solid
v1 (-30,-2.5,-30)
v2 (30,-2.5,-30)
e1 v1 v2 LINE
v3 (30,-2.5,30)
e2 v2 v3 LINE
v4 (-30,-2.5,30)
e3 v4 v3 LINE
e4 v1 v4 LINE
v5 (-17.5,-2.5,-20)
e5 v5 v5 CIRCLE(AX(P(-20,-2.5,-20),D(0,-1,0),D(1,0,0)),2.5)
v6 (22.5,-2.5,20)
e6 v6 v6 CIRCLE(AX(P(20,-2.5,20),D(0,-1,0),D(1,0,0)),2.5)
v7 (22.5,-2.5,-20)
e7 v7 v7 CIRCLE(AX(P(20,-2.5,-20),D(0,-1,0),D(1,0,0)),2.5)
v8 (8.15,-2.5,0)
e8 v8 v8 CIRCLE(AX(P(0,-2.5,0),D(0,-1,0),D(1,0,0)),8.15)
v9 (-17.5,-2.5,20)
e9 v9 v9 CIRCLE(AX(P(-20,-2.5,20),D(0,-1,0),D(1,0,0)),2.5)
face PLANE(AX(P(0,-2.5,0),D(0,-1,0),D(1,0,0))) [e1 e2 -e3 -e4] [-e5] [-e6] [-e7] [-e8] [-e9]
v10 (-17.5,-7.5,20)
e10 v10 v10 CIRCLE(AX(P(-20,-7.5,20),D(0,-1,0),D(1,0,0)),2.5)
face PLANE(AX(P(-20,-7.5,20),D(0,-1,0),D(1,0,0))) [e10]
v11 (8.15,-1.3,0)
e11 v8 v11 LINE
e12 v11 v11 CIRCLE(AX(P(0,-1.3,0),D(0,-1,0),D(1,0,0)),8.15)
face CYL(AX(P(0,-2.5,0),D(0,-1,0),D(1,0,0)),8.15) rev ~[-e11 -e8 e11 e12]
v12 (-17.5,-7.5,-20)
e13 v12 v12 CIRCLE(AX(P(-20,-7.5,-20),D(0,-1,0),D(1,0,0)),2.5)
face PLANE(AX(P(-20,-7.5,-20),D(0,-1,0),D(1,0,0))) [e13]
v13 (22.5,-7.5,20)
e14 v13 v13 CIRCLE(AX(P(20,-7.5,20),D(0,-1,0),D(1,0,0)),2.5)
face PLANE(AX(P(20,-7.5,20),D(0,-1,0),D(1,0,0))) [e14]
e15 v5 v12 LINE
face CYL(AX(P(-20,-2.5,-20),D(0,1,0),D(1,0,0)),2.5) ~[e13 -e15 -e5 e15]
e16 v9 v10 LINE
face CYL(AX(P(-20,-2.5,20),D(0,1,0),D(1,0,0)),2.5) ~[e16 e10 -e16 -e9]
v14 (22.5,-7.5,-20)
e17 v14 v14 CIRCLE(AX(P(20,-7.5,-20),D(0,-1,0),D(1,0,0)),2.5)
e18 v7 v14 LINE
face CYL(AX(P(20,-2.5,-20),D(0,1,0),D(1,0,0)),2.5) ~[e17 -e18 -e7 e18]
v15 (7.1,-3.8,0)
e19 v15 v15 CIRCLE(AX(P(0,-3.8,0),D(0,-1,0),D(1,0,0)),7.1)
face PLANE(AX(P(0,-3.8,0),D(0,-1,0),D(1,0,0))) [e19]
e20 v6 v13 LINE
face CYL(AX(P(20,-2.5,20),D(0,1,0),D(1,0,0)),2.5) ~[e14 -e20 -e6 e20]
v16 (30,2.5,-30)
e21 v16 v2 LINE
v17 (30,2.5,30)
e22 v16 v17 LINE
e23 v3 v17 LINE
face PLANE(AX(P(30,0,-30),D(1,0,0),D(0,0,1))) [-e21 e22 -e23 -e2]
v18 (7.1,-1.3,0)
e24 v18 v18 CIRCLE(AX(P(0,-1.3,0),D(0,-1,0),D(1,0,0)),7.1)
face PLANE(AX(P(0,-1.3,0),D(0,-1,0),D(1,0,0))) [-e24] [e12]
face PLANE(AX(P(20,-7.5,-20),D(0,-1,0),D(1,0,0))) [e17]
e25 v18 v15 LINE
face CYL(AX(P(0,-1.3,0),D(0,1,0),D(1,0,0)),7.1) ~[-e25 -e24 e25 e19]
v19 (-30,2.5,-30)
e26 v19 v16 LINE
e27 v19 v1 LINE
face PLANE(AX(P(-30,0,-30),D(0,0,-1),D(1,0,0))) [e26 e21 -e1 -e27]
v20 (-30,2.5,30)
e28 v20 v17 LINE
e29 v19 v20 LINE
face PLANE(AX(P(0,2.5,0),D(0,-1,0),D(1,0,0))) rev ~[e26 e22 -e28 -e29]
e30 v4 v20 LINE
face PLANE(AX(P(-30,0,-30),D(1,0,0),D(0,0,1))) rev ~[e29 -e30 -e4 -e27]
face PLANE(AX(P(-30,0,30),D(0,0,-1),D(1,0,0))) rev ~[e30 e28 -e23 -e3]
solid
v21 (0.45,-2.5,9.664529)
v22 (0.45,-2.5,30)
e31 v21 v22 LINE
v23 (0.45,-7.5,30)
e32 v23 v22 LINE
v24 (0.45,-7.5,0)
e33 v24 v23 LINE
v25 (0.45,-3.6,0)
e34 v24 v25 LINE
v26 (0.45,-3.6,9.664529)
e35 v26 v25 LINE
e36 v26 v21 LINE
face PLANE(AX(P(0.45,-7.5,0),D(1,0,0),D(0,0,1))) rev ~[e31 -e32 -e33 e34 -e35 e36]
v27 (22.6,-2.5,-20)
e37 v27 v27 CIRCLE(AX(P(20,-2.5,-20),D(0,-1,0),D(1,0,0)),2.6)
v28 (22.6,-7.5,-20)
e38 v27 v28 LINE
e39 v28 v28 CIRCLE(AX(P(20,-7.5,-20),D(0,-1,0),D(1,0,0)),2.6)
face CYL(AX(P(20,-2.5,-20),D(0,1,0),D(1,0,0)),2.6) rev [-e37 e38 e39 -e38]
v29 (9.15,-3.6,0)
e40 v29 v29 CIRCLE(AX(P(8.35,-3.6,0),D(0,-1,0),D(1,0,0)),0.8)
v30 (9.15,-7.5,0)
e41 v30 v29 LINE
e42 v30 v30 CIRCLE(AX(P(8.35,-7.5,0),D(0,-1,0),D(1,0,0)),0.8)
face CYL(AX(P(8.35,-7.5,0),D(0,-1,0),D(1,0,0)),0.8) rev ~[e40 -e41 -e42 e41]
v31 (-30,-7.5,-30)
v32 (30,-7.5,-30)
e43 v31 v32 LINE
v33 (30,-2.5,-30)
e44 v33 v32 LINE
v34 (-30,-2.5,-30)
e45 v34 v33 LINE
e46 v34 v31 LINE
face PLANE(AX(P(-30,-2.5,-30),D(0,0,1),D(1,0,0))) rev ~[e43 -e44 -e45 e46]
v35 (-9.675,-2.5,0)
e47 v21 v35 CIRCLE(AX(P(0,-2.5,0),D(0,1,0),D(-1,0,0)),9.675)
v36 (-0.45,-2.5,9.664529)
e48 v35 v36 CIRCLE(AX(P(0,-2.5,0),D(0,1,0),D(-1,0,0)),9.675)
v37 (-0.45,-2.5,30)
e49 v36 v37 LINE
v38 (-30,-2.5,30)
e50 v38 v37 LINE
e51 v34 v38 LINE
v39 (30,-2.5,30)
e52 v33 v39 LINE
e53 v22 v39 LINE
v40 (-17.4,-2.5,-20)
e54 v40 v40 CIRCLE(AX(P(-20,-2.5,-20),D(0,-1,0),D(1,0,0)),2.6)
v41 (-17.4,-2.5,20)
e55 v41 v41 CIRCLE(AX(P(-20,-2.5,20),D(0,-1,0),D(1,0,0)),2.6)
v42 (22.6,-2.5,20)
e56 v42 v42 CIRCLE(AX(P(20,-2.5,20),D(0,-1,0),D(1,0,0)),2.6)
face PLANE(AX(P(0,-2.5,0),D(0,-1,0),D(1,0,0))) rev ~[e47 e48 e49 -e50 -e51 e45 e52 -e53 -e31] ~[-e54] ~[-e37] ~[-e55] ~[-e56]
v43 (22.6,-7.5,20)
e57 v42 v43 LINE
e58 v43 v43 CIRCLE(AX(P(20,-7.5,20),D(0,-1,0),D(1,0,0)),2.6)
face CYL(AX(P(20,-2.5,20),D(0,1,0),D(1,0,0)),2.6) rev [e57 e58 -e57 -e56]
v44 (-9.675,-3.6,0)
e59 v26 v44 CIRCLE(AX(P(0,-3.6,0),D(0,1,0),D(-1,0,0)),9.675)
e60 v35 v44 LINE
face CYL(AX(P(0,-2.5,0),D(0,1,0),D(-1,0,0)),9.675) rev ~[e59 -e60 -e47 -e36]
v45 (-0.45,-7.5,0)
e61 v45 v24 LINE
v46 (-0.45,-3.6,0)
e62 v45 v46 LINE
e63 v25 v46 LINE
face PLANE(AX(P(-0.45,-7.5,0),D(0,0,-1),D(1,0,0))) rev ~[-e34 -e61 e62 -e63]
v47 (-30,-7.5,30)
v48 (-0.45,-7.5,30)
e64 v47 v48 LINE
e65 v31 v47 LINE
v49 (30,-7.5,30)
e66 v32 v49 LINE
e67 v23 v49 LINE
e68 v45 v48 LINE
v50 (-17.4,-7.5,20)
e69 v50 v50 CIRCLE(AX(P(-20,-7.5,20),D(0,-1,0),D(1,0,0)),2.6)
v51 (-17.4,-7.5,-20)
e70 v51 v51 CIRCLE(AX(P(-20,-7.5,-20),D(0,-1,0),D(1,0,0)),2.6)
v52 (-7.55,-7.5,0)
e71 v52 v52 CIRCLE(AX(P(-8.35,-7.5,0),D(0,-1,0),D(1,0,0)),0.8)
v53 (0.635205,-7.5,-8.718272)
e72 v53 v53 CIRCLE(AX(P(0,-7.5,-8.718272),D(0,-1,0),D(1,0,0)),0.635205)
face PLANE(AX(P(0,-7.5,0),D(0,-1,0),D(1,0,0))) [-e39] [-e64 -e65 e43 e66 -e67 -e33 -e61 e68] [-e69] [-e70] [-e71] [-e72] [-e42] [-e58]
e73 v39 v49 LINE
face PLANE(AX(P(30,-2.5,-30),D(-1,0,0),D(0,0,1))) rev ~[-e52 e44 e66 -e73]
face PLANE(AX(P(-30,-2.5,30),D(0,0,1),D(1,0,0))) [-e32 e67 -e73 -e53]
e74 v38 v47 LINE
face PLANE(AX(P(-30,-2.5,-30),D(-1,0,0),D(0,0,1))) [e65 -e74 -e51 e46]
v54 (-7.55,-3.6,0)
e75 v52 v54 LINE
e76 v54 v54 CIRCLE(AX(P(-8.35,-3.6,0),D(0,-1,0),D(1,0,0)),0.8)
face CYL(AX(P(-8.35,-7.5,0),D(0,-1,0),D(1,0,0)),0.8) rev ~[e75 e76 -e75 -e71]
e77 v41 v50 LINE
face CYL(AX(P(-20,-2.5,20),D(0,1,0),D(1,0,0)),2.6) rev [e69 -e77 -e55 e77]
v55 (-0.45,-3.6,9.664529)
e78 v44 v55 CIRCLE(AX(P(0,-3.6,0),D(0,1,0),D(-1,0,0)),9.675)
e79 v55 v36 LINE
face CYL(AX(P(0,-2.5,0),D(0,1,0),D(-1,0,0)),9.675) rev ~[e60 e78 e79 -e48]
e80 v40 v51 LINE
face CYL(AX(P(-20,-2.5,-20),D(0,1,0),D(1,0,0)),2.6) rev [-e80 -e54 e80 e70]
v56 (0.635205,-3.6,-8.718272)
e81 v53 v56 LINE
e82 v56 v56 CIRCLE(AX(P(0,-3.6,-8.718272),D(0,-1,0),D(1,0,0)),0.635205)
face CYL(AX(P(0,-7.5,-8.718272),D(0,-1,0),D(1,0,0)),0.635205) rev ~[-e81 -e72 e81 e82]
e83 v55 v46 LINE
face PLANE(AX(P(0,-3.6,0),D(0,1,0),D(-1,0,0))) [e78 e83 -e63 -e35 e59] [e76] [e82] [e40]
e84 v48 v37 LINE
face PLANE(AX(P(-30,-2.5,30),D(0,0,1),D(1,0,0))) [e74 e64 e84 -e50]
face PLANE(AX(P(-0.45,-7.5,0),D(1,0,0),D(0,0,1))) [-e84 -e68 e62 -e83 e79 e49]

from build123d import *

# Parameters (mm, degrees)
F0_W      = 60
F0_H      = 60
F1_DEPTH  = 2.5
F2_R      = 8.15
F3_DEPTH  = 1.2
F4_R      = 7.1
F5_DEPTH  = 2.5
F6_R      = 2.5
F7_DEPTH  = 5
F8_W      = 60
F8_H      = 60
F8_R      = 2.6
F9_DEPTH  = 5
F10_R     = 9.675
F11_DEPTH = 1.1
F12_W     = 0.9
F12_H     = 32.9937078059
F13_DEPTH = 25
F14_R     = 0.8
F15_DEPTH = 25
F16_R     = 0.6352054313
F17_DEPTH = 25


with BuildPart() as f1:
    # F0 (on Front) → F1 (new body, symmetric)
    with BuildSketch(Plane.XZ):
        Rectangle(F0_W, F0_H)
    extrude(amount=F1_DEPTH, both=True)

    # F2 (on face) → F3 (cut)
    with BuildSketch(Plane.XZ.offset(2.5)):
        Circle(F2_R)
    extrude(amount=-F3_DEPTH, mode=Mode.SUBTRACT)

    # F4 (on face) → F5 (join)
    with BuildSketch(Plane.XZ.offset(1.3)):
        Circle(F4_R)
    extrude(amount=F5_DEPTH)

    # F6 (on face) → F7 (join)
    with BuildSketch(Plane.XZ.offset(2.5)):
        with Locations((-20, 20)):
            Circle(F6_R)
        with Locations((20, 20)):
            Circle(F6_R)
        with Locations((20, -20)):
            Circle(F6_R)
        with Locations((-20, -20)):
            Circle(F6_R)
    extrude(amount=F7_DEPTH)


with BuildPart() as f9:
    # F8 (on face) → F9 (new body)
    with BuildSketch(Plane.XZ.offset(2.5)):
        Rectangle(F8_W, F8_H)
        with Locations((-20, -20)):
            Circle(F8_R, mode=Mode.SUBTRACT)
        with Locations((20, -20)):
            Circle(F8_R, mode=Mode.SUBTRACT)
        with Locations((-20, 20)):
            Circle(F8_R, mode=Mode.SUBTRACT)
        with Locations((20, 20)):
            Circle(F8_R, mode=Mode.SUBTRACT)
    extrude(amount=F9_DEPTH)

    # F10 (on face) → F11 (cut)
    with BuildSketch(Plane(origin=(0, -2.5, 0), x_dir=(-1, 0, 0), z_dir=(0, 1, 0))):
        Circle(F10_R)
    extrude(amount=-F11_DEPTH, mode=Mode.SUBTRACT)

    # F12 (on face) → F13 (cut)
    with BuildSketch(Plane.XZ.offset(7.5)):
        with Locations((0, 16.4968539029)):
            Rectangle(F12_W, F12_H)
    extrude(amount=-F13_DEPTH, mode=Mode.SUBTRACT)

    # F14 (on face) → F15 (cut)
    with BuildSketch(Plane.XZ.offset(7.5)):
        with Locations((-8.35, 0)):
            Circle(F14_R)
        with Locations((8.35, 0)):
            Circle(F14_R)
    extrude(amount=-F15_DEPTH, mode=Mode.SUBTRACT)

    # F16 (on face) → F17 (cut)
    with BuildSketch(Plane.XZ.offset(7.5)):
        with Locations((0, -8.7182717398)):
            Circle(F16_R)
    extrude(amount=-F17_DEPTH, mode=Mode.SUBTRACT)


solid = Compound([f1.part, f9.part])
